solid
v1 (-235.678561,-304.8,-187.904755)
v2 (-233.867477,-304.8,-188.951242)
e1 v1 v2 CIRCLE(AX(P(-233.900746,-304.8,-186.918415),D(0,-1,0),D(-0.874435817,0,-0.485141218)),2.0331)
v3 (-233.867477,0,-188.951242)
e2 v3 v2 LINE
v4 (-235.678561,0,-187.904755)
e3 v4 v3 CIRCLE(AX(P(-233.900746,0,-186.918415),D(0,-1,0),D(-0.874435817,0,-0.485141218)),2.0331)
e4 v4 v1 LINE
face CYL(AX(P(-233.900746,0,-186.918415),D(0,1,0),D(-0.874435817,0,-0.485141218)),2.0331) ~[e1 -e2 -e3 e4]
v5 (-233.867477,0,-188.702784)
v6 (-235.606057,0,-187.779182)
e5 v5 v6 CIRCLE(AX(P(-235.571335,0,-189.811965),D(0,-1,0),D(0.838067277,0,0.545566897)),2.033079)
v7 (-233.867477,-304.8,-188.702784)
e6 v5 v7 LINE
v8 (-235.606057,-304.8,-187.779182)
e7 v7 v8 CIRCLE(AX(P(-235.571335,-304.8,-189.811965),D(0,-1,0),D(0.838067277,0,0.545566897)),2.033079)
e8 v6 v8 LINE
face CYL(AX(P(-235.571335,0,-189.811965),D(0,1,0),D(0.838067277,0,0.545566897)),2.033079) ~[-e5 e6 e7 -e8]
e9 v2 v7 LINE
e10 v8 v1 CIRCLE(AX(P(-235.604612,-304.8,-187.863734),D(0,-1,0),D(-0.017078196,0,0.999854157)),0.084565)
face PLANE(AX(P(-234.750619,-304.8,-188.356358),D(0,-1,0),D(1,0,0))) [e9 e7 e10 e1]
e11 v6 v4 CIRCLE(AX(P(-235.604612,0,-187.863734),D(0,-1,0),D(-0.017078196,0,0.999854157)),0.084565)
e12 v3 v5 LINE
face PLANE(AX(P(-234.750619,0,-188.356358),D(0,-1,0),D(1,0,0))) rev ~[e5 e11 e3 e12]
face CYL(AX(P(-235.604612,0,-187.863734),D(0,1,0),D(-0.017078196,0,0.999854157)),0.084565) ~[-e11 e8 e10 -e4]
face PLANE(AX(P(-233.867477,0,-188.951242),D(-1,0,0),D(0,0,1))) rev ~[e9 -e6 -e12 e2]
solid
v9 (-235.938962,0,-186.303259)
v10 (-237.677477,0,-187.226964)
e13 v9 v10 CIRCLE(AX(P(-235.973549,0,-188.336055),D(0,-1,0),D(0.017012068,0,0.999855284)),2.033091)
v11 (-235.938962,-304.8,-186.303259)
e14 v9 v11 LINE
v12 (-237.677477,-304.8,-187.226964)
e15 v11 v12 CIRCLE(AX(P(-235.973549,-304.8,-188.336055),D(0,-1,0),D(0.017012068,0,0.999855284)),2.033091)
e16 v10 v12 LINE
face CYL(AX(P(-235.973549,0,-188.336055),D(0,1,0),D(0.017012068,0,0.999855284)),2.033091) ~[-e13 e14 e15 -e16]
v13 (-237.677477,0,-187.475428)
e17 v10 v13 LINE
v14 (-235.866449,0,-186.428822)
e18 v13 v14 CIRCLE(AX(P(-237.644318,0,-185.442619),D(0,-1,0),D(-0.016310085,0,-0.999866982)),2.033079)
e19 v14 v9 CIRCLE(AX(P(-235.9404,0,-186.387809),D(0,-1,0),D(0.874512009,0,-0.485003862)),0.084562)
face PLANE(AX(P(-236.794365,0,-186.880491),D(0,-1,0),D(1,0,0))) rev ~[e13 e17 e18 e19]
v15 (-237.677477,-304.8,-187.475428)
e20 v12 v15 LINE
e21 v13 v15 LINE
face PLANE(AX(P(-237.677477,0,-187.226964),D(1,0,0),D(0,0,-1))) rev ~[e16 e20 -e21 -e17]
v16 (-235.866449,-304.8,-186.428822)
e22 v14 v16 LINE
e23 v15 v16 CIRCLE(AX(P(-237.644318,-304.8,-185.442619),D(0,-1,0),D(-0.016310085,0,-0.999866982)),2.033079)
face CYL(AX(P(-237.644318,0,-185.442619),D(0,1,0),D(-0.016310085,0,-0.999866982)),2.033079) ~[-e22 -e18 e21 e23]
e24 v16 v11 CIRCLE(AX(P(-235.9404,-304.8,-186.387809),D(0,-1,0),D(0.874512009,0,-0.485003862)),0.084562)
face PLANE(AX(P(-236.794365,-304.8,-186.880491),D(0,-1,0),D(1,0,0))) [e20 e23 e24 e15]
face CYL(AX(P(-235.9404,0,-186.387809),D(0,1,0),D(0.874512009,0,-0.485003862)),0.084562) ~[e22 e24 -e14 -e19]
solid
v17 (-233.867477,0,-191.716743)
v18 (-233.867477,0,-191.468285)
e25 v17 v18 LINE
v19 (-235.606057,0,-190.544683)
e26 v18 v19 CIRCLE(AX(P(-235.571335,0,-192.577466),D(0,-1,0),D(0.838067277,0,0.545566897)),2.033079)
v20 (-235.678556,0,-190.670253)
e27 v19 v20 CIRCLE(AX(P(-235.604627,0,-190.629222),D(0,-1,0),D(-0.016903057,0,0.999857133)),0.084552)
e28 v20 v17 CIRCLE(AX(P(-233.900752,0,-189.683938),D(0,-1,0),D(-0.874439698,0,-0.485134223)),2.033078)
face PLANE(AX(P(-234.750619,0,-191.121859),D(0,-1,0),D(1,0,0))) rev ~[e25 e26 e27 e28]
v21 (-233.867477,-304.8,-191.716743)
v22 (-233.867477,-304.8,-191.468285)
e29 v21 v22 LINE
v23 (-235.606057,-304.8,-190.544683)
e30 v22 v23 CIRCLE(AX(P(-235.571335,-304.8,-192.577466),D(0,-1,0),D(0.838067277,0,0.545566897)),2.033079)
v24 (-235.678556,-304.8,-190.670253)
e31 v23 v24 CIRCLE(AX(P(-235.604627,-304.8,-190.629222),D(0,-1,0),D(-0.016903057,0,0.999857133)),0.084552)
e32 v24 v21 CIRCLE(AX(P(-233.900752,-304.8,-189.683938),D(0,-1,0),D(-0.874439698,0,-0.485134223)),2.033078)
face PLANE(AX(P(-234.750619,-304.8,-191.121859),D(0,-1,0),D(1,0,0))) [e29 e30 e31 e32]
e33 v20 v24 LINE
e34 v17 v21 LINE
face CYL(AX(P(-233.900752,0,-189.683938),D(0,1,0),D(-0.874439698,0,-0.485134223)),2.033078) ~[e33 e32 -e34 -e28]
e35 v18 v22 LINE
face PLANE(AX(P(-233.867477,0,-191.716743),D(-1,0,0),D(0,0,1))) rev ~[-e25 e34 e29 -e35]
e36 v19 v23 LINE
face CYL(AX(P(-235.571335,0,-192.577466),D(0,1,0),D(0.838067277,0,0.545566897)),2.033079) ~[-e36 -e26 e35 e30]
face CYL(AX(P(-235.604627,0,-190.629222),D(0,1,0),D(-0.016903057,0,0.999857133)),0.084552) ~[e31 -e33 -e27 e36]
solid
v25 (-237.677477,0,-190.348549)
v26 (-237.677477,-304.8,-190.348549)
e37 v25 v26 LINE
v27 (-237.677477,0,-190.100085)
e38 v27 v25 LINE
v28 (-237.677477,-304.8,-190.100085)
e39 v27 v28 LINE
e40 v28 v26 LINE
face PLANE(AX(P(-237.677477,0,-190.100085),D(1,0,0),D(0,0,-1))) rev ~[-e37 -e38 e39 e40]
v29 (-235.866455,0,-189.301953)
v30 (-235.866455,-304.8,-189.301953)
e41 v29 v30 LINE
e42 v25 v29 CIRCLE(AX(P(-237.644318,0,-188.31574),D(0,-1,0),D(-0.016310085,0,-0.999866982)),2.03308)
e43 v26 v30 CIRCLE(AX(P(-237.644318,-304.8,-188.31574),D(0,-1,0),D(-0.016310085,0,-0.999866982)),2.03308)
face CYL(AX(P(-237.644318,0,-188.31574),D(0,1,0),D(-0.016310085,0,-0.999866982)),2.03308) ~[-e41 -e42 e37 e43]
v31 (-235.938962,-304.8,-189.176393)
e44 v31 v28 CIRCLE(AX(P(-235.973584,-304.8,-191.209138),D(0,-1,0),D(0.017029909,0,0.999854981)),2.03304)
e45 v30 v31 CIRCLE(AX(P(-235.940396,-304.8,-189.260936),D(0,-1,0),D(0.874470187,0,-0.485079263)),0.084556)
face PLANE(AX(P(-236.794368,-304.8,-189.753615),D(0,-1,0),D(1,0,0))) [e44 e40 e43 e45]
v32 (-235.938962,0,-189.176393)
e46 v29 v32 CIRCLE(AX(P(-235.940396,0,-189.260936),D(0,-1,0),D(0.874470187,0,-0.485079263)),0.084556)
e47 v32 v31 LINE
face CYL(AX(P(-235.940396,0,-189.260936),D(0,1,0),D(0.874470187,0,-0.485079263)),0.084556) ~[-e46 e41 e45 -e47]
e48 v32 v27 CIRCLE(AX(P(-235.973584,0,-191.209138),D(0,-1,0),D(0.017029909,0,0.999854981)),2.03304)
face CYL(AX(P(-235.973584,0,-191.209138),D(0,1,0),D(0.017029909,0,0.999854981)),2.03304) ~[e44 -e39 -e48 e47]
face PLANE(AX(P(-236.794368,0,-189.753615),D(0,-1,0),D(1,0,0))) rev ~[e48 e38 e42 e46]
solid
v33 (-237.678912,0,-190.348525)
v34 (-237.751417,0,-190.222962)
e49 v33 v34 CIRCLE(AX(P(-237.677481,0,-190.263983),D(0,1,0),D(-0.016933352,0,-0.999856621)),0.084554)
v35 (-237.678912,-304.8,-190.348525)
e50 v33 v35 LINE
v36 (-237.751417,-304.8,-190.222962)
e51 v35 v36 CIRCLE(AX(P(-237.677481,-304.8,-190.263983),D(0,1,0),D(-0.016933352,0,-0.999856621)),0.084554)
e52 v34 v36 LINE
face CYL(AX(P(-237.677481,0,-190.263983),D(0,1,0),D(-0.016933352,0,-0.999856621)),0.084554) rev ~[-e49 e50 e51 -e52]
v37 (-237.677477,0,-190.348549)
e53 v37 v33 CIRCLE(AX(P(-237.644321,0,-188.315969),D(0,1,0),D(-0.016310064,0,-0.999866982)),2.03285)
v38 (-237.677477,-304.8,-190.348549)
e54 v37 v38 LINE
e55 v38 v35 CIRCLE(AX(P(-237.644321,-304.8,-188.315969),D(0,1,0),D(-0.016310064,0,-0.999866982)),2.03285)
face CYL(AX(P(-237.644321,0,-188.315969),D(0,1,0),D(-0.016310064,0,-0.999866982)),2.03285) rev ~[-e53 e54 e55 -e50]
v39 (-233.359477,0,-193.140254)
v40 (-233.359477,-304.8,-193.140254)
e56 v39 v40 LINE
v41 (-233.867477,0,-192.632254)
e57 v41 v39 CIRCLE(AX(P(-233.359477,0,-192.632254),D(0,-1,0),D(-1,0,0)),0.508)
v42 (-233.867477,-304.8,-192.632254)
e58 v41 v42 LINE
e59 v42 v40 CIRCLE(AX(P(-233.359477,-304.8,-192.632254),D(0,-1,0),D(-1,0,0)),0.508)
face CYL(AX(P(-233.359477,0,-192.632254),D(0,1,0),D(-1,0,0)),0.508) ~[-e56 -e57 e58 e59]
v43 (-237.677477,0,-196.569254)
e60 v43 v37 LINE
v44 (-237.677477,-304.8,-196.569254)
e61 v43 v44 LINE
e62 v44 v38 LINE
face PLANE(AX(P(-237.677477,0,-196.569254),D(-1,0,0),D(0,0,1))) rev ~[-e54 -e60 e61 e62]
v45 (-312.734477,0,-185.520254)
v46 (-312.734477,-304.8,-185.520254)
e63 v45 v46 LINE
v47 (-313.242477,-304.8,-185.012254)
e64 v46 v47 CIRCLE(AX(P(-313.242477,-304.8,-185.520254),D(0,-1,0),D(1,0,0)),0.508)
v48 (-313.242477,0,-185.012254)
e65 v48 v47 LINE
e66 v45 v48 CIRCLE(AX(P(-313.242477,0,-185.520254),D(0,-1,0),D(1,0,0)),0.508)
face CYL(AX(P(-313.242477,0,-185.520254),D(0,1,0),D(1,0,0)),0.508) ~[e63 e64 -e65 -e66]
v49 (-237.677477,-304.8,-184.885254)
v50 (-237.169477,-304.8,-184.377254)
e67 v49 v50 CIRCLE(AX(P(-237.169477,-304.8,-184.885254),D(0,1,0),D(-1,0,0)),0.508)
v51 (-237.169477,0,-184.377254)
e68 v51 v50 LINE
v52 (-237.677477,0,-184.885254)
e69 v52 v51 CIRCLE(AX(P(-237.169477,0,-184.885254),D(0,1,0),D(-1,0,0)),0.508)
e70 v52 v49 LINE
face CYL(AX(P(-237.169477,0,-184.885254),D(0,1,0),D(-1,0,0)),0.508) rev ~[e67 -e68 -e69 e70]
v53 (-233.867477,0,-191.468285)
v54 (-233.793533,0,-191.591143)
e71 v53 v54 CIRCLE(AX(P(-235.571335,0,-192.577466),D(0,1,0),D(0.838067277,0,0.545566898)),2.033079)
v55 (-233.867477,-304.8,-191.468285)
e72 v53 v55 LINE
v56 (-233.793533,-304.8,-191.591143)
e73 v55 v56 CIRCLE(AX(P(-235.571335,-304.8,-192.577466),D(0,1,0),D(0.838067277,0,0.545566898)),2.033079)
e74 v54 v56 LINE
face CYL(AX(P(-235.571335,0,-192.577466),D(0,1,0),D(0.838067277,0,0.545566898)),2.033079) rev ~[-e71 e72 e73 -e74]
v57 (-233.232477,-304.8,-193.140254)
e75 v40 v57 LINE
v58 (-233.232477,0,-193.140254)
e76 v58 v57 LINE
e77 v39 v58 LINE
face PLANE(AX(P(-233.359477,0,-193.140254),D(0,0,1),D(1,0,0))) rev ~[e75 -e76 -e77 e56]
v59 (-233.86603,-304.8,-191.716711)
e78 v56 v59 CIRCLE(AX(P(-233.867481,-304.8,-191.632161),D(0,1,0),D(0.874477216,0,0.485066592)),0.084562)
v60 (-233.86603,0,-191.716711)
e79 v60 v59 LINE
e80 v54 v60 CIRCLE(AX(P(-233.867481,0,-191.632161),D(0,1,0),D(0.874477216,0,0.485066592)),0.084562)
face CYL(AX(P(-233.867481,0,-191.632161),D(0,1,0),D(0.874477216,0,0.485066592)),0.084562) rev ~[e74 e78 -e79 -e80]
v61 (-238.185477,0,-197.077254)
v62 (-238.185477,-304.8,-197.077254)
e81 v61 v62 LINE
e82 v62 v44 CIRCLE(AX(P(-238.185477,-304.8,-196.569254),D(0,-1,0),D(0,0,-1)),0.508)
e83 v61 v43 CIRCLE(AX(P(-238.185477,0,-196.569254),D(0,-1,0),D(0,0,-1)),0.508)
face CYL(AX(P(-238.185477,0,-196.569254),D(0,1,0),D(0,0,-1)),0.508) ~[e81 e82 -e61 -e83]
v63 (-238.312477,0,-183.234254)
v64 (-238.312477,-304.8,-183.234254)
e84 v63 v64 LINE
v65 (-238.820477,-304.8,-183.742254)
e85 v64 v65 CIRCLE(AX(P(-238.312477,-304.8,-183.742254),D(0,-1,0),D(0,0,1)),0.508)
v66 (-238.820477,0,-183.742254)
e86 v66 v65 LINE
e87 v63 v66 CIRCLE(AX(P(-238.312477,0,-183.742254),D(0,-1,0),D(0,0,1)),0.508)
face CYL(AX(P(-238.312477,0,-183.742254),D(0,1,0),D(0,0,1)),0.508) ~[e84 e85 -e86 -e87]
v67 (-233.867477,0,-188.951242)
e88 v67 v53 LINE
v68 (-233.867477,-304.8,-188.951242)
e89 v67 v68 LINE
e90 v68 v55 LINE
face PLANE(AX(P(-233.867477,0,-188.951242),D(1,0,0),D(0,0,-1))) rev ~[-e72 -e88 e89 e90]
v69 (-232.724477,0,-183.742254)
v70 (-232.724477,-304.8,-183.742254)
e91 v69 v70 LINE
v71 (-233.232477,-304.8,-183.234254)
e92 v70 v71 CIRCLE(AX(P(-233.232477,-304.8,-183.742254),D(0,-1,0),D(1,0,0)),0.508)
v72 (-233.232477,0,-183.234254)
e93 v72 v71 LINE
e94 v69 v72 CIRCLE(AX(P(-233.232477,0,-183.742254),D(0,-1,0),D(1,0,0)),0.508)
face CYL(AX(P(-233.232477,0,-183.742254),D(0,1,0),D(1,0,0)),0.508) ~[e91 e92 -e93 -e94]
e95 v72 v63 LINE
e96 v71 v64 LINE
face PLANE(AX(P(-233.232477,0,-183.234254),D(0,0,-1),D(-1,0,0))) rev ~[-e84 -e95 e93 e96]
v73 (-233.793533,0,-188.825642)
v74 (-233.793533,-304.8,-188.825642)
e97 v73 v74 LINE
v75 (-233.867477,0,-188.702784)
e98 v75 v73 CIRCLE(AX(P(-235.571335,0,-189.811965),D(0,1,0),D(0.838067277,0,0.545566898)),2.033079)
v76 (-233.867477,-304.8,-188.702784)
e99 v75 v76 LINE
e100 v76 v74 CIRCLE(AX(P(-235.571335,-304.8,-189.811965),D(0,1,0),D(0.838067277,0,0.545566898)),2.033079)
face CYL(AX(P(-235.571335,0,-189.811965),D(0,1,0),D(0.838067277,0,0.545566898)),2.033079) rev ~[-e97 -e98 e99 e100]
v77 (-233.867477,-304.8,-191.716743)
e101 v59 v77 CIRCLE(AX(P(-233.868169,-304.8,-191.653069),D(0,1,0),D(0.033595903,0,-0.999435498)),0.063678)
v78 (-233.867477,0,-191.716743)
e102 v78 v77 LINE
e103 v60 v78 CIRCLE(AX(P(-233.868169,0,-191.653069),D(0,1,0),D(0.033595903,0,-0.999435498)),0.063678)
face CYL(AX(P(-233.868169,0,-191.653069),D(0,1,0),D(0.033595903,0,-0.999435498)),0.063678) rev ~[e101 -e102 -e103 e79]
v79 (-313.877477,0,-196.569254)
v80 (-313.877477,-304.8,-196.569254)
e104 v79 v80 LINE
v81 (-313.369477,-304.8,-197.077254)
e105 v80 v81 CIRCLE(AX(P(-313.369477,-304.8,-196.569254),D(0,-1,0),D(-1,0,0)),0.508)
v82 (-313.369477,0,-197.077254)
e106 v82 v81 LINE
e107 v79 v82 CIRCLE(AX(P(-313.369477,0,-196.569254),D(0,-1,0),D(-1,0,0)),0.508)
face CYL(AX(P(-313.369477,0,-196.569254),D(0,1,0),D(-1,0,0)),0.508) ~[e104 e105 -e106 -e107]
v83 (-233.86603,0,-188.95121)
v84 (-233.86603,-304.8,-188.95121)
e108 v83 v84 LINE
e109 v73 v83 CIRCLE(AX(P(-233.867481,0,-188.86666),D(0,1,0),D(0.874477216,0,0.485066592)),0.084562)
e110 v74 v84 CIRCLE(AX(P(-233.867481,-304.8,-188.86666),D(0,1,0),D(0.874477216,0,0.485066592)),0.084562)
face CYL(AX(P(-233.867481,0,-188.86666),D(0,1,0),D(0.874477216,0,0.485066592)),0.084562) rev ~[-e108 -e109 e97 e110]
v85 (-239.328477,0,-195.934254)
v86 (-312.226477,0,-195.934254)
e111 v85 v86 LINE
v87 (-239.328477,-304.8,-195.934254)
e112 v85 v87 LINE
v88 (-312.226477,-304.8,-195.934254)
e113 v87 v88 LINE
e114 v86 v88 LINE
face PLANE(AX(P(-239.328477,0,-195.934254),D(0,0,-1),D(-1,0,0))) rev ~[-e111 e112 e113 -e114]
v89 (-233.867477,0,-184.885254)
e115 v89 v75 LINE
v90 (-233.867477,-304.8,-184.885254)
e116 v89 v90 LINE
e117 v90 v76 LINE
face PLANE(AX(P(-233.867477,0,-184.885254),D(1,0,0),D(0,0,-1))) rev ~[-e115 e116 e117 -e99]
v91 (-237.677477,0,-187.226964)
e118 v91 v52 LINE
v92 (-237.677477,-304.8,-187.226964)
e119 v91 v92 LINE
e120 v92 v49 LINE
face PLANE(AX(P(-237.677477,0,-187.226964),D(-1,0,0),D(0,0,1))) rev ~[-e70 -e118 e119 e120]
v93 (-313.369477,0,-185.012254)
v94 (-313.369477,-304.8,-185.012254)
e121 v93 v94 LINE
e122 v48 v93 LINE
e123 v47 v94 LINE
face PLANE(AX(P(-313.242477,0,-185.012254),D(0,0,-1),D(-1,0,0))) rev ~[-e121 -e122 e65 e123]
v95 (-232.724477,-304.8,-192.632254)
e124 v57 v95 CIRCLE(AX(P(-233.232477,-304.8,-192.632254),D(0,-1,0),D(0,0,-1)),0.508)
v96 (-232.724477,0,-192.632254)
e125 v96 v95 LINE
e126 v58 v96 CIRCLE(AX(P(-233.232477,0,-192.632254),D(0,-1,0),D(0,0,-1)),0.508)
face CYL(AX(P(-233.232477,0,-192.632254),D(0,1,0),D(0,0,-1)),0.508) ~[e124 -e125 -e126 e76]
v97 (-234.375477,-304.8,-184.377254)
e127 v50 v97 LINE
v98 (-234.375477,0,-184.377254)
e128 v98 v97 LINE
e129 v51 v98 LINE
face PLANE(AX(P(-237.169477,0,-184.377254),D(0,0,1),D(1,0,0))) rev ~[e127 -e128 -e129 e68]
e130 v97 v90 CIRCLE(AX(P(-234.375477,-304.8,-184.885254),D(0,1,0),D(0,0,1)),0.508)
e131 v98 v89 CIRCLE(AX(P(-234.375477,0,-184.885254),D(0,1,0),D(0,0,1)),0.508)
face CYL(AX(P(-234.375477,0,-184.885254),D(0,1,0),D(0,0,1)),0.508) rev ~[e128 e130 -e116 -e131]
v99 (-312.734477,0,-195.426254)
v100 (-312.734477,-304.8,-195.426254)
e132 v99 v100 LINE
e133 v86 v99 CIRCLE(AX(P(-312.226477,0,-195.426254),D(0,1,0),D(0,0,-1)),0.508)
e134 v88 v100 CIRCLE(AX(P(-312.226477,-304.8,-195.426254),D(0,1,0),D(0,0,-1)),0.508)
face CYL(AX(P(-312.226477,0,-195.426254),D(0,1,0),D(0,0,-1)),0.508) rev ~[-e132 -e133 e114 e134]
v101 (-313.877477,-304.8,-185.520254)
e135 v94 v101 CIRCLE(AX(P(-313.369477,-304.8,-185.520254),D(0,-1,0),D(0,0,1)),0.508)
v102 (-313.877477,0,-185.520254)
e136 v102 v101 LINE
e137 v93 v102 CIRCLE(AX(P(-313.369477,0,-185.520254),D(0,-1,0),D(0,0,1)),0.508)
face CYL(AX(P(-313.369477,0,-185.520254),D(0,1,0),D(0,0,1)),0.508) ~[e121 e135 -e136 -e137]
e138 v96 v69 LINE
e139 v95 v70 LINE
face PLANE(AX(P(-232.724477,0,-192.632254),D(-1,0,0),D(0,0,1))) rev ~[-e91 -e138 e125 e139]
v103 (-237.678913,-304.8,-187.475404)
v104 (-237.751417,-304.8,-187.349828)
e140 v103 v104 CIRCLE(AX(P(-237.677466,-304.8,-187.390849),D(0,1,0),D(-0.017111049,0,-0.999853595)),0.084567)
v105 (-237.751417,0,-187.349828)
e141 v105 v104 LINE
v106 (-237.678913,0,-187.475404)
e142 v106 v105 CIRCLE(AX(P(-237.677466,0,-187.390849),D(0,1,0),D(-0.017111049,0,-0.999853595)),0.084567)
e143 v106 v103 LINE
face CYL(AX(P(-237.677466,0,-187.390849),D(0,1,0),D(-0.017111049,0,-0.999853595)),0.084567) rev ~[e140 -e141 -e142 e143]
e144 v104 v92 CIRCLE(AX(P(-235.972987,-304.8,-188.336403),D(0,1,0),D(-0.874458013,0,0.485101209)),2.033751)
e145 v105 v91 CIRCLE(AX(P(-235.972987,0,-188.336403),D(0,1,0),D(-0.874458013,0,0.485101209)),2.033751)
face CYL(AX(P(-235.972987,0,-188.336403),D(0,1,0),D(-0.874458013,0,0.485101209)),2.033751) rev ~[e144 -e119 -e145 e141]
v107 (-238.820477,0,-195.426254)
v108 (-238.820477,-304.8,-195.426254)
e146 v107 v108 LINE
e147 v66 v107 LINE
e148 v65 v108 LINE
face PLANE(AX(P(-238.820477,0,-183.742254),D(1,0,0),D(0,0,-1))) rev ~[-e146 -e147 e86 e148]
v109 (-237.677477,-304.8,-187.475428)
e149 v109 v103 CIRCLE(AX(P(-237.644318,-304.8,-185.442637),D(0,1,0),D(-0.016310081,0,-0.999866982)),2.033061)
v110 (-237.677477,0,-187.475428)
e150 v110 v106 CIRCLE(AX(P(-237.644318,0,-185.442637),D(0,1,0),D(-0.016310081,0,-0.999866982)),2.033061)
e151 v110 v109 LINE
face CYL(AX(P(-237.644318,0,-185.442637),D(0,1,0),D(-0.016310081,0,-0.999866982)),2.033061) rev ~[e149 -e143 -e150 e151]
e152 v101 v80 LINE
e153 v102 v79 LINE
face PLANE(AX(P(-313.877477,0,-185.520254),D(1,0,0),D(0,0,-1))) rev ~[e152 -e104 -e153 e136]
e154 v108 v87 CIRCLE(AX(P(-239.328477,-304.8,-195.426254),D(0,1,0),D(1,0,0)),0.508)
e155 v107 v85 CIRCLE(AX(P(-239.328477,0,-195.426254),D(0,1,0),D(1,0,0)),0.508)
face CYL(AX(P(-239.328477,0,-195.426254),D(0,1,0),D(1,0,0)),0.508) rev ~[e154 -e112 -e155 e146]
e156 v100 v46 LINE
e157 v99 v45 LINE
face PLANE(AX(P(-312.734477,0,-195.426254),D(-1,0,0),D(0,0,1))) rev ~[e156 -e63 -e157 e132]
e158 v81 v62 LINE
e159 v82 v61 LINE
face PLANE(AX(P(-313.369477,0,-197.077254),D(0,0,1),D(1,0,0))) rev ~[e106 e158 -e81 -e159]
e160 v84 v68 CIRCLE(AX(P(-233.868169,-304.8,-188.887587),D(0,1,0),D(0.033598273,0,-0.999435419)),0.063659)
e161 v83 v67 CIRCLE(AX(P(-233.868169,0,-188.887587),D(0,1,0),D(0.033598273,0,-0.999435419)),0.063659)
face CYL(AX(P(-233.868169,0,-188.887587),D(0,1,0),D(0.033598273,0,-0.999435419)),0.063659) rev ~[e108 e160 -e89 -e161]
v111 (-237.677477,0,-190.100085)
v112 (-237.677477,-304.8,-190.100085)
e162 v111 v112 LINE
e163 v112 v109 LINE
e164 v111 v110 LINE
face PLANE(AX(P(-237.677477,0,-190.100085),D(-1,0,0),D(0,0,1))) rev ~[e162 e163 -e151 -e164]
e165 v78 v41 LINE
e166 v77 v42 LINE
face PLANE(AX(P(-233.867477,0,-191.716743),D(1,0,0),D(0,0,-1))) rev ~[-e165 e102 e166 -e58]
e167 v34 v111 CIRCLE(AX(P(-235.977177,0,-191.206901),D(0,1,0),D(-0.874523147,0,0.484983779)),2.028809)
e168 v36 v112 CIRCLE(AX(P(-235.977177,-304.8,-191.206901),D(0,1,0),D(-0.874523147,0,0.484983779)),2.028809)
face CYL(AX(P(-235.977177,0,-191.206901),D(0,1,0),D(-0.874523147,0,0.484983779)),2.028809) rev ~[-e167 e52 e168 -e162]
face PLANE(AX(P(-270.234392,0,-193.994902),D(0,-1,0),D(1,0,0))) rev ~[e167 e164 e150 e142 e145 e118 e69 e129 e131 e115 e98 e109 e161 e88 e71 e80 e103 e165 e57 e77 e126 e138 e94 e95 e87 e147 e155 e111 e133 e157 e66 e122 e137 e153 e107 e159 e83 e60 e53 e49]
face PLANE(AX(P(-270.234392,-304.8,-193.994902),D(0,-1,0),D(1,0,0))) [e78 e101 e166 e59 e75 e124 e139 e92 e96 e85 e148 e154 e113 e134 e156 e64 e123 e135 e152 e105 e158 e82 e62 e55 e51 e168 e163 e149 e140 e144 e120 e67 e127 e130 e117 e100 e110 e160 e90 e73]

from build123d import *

# Parameters (mm, degrees)
F1_DEPTH = 609.6
F2_SCALE = 0.5


# Not quite as in the source:
# - ends of sketch curves that miss each other by under 0.0002 mm in the source are joined


with BuildPart() as f1:
    # F0 (on Front) → F1 (new body)
    with BuildSketch(Plane.XZ):
        with BuildLine():
            Line((-475.3549548, -393.1385076), (-475.3549548, -380.6970975265))
            ThreePointArc((-475.3549548, -380.6970975265), (-475.3563898659, -380.697073864), (-475.3578249233, -380.6970496949))
            ThreePointArc((-475.3578249233, -380.6970496949), (-475.5014064418, -380.6125311151), (-475.5028342338, -380.4459240484))
            ThreePointArc((-475.5028342338, -380.4459240484), (-475.4310666689, -380.3217397475), (-475.3549548, -380.2001693517))
            Line((-475.3549548, -380.2001693517), (-475.3549548, -374.9508555265))
            ThreePointArc((-475.3549548, -374.9508555265), (-475.356390082, -374.9508318604), (-475.3578253555, -374.9508076876))
            ThreePointArc((-475.3578253555, -374.9508076876), (-475.5014064418, -374.8662637151), (-475.5028342338, -374.6996566484))
            ThreePointArc((-475.5028342338, -374.6996566484), (-475.4310609426, -374.5754882319), (-475.3549548, -374.4539273517))
            Line((-475.3549548, -374.4539273517), (-475.3549548, -369.7705076))
            ThreePointArc((-475.3549548, -369.7705076), (-475.0573752897, -369.0520871103), (-474.3389548, -368.7545076))
            Line((-474.3389548, -368.7545076), (-468.7509548, -368.7545076))
            ThreePointArc((-468.7509548, -368.7545076), (-468.0325343103, -369.0520871103), (-467.7349548, -369.7705076))
            Line((-467.7349548, -369.7705076), (-467.7349548, -377.4055678497))
            ThreePointArc((-467.7349548, -377.4055678497), (-467.6588433745, -377.5271215868), (-467.5870659133, -377.6512838039))
            ThreePointArc((-467.5870659133, -377.6512838039), (-467.5884969176, -377.8178853065), (-467.7320596244, -377.9024198158))
            ThreePointArc((-467.7320596244, -377.9024198158), (-467.7335070711, -377.9024602361), (-467.7349548, -377.9024841911))
            Line((-467.7349548, -377.9024841911), (-467.7349548, -382.9365702497))
            ThreePointArc((-467.7349548, -382.9365702497), (-467.6588433745, -383.0581239868), (-467.5870659133, -383.1822862039))
            ThreePointArc((-467.5870659133, -383.1822862039), (-467.5884968089, -383.3488875182), (-467.7320591896, -383.4334222084))
            ThreePointArc((-467.7320591896, -383.4334222084), (-467.7335068543, -383.4334626325), (-467.7349548, -383.4334865911))
            Line((-467.7349548, -383.4334865911), (-467.7349548, -385.2645076))
            ThreePointArc((-467.7349548, -385.2645076), (-467.4373752897, -385.9829280897), (-466.7189548, -386.2805076))
            Line((-466.7189548, -386.2805076), (-466.4649548, -386.2805076))
            ThreePointArc((-466.4649548, -386.2805076), (-465.7465343103, -385.9829280897), (-465.4489548, -385.2645076))
            Line((-465.4489548, -385.2645076), (-465.4489548, -367.4845076))
            ThreePointArc((-465.4489548, -367.4845076), (-465.7465343103, -366.7660871103), (-466.4649548, -366.4685076))
            Line((-466.4649548, -366.4685076), (-476.6249548, -366.4685076))
            ThreePointArc((-476.6249548, -366.4685076), (-477.3433752897, -366.7660871103), (-477.6409548, -367.4845076))
            Line((-477.6409548, -367.4845076), (-477.6409548, -390.8525076))
            ThreePointArc((-477.6409548, -390.8525076), (-477.9385343103, -391.5709280897), (-478.6569548, -391.8685076))
            Line((-478.6569548, -391.8685076), (-624.4529548, -391.8685076))
            ThreePointArc((-624.4529548, -391.8685076), (-625.1713752897, -391.5709280897), (-625.4689548, -390.8525076))
            Line((-625.4689548, -390.8525076), (-625.4689548, -371.0405076))
            ThreePointArc((-625.4689548, -371.0405076), (-625.7665343103, -370.3220871103), (-626.4849548, -370.0245076))
            Line((-626.4849548, -370.0245076), (-626.7389548, -370.0245076))
            ThreePointArc((-626.7389548, -370.0245076), (-627.4573752897, -370.3220871103), (-627.7549548, -371.0405076))
            Line((-627.7549548, -371.0405076), (-627.7549548, -393.1385076))
            ThreePointArc((-627.7549548, -393.1385076), (-627.4573752897, -393.8569280897), (-626.7389548, -394.1545076))
            Line((-626.7389548, -394.1545076), (-476.3709548, -394.1545076))
            ThreePointArc((-476.3709548, -394.1545076), (-475.6525343103, -393.8569280897), (-475.3549548, -393.1385076))
        make_face()
    extrude(amount=F1_DEPTH)


with BuildPart() as f1b:
    # F0 (on Front) → F1, piece 2 (new body)
    with BuildSketch(Plane.XZ):
        with BuildLine():
            Line((-475.3549548, -374.4539273517), (-475.3549548, -374.9508555265))
            ThreePointArc((-475.3549548, -374.9508555265), (-473.2540858532, -374.4057852487), (-471.7328988759, -372.8576437436))
            ThreePointArc((-471.7328988759, -372.8576437436), (-471.7343450388, -372.6910369501), (-471.8779233823, -372.6065181587))
            ThreePointArc((-471.8779233823, -372.6065181587), (-473.8549585951, -373.0813038086), (-475.3549548, -374.4539273517))
        make_face()
    extrude(amount=F1_DEPTH)


with BuildPart() as f1c:
    # F0 (on Front) → F1, piece 3 (new body)
    with BuildSketch(Plane.XZ):
        with BuildLine():
            Line((-467.7349548, -377.9024841911), (-467.7349548, -377.4055678497))
            ThreePointArc((-467.7349548, -377.4055678497), (-469.2350389344, -376.0330252213), (-471.2121130491, -375.5583636344))
            ThreePointArc((-471.2121130491, -375.5583636344), (-471.355694534, -375.6429030983), (-471.3571224338, -375.8095103516))
            ThreePointArc((-471.3571224338, -375.8095103516), (-469.835840158, -377.3575402656), (-467.7349548, -377.9024841911))
        make_face()
    extrude(amount=F1_DEPTH)


with BuildPart() as f1d:
    # F0 (on Front) → F1, piece 4 (new body)
    with BuildSketch(Plane.XZ):
        with BuildLine():
            ThreePointArc((-475.3549548, -380.6970975265), (-473.2540954687, -380.1520328055), (-471.7329096502, -378.6039051668))
            ThreePointArc((-471.7329096502, -378.6039051668), (-471.7343450388, -378.4373043501), (-471.8779233823, -378.3527855587))
            ThreePointArc((-471.8779233823, -378.3527855587), (-473.8549584042, -378.8275457072), (-475.3549548, -380.2001693517))
            Line((-475.3549548, -380.2001693517), (-475.3549548, -380.6970975265))
        make_face()
    extrude(amount=F1_DEPTH)


with BuildPart() as f1e:
    # F0 (on Front) → F1, piece 5 (new body)
    with BuildSketch(Plane.XZ):
        with BuildLine():
            Line((-467.7349548, -383.4334865911), (-467.7349548, -382.9365702497))
            ThreePointArc((-467.7349548, -382.9365702497), (-469.2350389344, -381.5640276213), (-471.2121130491, -381.0893660344))
            ThreePointArc((-471.2121130491, -381.0893660344), (-471.3557001943, -381.1738899017), (-471.3571116581, -381.3405067716))
            ThreePointArc((-471.3571116581, -381.3405067716), (-469.835840158, -382.8885426656), (-467.7349548, -383.4334865911))
        make_face()
    extrude(amount=F1_DEPTH)


with BuildPart() as f1d_1:
    # F2: moved
    add(f1d.part.scale(F2_SCALE))


with BuildPart() as f1_1:
    # F2: moved
    add(f1.part.scale(F2_SCALE))


with BuildPart() as f1b_1:
    # F2: moved
    add(f1b.part.scale(F2_SCALE))


with BuildPart() as f1e_1:
    # F2: moved
    add(f1e.part.scale(F2_SCALE))


with BuildPart() as f1c_1:
    # F2: moved
    add(f1c.part.scale(F2_SCALE))


solid = Compound([f1d_1.part, f1_1.part, f1b_1.part, f1e_1.part, f1c_1.part])
